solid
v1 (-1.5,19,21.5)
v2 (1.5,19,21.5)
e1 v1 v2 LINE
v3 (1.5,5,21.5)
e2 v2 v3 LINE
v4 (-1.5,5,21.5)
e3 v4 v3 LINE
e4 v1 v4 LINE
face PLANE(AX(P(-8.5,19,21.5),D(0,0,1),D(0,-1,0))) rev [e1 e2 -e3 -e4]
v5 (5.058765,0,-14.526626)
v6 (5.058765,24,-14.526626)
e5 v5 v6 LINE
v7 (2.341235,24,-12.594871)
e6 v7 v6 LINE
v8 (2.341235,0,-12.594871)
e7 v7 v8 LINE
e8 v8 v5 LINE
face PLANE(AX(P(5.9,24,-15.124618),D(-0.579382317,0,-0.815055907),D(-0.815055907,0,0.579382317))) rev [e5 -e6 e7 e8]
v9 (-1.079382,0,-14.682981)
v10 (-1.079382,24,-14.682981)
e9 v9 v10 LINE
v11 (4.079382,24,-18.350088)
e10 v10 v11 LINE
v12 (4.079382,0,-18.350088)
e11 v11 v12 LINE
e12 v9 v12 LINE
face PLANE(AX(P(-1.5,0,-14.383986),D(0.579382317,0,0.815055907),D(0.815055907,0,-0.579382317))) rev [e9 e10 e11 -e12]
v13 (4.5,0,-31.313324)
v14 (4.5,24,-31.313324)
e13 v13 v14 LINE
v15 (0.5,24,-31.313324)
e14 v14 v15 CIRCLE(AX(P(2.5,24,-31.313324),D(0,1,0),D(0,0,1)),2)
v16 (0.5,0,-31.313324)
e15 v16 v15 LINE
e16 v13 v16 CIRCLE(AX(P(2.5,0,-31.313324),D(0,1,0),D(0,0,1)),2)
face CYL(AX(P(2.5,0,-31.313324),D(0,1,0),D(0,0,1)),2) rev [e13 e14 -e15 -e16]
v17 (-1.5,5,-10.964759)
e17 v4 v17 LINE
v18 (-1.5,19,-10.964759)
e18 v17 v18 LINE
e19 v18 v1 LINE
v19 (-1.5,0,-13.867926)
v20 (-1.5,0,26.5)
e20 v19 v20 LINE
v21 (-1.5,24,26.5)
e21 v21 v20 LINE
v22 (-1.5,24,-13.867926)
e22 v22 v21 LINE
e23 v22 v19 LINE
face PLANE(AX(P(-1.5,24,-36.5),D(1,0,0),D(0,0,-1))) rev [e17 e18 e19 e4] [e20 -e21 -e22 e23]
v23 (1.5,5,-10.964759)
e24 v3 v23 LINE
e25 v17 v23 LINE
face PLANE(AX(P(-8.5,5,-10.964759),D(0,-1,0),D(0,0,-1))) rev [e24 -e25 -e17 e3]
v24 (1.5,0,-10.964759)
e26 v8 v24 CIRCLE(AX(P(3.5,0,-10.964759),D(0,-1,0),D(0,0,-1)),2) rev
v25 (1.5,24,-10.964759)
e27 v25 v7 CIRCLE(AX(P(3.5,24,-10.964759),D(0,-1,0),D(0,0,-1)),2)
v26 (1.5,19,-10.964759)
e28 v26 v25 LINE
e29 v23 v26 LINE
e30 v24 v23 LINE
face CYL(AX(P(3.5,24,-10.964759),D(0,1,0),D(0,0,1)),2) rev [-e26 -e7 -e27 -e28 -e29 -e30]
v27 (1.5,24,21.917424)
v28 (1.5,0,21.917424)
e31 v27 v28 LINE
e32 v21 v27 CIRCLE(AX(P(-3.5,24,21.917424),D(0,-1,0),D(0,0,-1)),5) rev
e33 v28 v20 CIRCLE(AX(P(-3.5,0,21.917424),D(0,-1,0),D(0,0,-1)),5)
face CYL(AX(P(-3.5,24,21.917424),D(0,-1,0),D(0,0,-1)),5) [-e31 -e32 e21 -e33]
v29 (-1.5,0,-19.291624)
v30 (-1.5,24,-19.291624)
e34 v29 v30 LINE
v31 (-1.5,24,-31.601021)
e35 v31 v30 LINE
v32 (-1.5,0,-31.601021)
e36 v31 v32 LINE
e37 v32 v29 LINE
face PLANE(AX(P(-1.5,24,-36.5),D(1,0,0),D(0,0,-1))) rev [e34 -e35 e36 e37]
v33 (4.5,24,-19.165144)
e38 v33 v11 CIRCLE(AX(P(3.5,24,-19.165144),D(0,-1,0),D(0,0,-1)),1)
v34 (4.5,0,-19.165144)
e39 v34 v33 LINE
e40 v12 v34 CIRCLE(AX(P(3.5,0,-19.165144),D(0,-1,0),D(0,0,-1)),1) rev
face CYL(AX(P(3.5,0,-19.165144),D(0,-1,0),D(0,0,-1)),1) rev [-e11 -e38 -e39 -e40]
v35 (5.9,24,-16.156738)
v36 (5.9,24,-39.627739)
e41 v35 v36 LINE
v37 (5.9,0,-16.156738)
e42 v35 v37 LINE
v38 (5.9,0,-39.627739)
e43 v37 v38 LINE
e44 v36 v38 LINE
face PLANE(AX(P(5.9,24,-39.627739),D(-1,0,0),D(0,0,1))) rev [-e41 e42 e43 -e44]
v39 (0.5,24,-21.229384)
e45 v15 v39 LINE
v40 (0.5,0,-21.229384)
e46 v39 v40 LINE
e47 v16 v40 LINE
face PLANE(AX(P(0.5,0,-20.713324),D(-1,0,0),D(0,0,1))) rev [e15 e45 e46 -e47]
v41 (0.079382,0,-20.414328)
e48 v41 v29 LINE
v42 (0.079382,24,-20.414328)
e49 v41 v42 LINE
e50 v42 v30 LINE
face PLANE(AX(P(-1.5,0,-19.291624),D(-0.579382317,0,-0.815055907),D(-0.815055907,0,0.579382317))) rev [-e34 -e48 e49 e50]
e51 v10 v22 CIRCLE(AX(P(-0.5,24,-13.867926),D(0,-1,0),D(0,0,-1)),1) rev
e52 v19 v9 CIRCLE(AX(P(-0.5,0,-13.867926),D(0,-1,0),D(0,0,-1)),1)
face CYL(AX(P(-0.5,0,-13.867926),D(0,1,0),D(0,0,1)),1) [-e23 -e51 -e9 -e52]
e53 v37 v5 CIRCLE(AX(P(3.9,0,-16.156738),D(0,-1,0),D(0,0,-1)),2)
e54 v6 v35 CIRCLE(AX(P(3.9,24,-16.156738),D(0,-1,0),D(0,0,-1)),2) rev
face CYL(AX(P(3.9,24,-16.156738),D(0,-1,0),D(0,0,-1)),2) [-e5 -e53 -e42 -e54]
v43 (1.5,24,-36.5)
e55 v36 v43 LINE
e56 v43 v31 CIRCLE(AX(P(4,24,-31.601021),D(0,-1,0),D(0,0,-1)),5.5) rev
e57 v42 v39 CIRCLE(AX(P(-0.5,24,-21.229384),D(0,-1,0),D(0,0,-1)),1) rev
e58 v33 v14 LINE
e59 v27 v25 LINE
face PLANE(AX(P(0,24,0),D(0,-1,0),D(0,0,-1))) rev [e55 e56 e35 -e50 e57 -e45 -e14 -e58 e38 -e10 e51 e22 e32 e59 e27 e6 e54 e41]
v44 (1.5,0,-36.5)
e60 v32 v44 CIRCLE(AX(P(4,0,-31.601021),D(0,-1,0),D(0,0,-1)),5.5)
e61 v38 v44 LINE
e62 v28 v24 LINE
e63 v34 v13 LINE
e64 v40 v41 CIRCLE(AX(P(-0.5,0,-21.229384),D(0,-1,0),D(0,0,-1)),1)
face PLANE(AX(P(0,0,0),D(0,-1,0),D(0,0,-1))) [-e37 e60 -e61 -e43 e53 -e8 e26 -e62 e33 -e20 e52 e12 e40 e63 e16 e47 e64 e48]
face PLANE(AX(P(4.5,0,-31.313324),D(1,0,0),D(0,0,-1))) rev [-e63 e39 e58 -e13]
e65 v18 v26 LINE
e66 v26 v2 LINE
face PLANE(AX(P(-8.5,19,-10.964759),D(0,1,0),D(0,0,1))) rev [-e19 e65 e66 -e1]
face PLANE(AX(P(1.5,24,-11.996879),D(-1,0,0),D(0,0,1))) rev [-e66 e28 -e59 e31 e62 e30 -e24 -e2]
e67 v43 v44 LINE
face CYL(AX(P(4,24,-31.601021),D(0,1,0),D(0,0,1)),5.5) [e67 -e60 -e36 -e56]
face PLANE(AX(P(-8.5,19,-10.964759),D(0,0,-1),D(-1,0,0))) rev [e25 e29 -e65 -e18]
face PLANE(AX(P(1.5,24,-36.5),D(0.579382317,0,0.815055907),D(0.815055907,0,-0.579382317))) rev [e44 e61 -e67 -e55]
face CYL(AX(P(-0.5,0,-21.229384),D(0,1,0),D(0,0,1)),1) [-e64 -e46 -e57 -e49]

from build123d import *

# Parameters (mm, degrees)
BOSS_EXTRUDE1_DEPTH = 24
CUT_EXTRUDE1_DEPTH  = 24
FILLET5_R           = 1
FILLET6_R           = 5.5
FILLET8_R           = 2
SKETCH3_W           = 32.464758902
SKETCH3_H           = 14
CUT_EXTRUDE2_DEPTH  = 10
FILLET9_R           = 5


with BuildPart() as part:
    # Sketch1 → Boss-Extrude1 (new body)
    with BuildSketch(Plane(origin=(0, 0, 0), x_dir=(1, 0, 0), z_dir=(0, 1, 0))):
        Polygon((1.5, 36.5), (5.9, 39.627739059), (5.9, 15.124617794), (1.5, 11.996878735), (1.5, -26.5), (-1.5, -26.5), (-1.5, 36.5), align=None)
    extrude(amount=BOSS_EXTRUDE1_DEPTH)

    # Sketch2 → Cut-Extrude1 (cut)
    with BuildSketch(Plane(origin=(0, 24, 0), x_dir=(1, 0, 0), z_dir=(0, 1, 0))):
        with BuildLine():
            Line((-1.5, 14.383985508), (4.5, 18.649084224))
            Line((4.5, 18.649084224), (4.5, 31.313323891))
            ThreePointArc((4.5, 31.313323891), (2.5, 33.313323891), (0.5, 31.313323891))
            Line((0.5, 31.313323891), (0.5, 20.713323891))
            Line((0.5, 20.713323891), (-1.5, 19.291624318))
            Line((-1.5, 19.291624318), (-1.5, 14.383985508))
        make_face()
    extrude(amount=-CUT_EXTRUDE1_DEPTH, mode=Mode.SUBTRACT)

    # Fillet5
    fillet5_edges = [part.edges().sort_by_distance(p)[0] for p in [
        (-1.5, 12, -14.383985508),
        (0.5, 12, -20.713323891),
        (4.5, 12, -18.649084224),
    ]]
    fillet(fillet5_edges, radius=FILLET5_R)

    # Fillet6
    # the kernel refuses this fillet: 5.5 mm, written as the material it takes off along each edge
    with BuildSketch(Plane(origin=(-1.5, -12.247448714, -36.5), x_dir=(0, 0, 1), z_dir=(0, 1, 0))) as fillet6_piece_1:
        with BuildLine():
            CenterArc((4.898979486, 5.5), FILLET6_R, 207.035691789, 62.964308211)
            Line((0, 3), (-0.09797959, 2.95))
            ThreePointArc((-0.09797959, 2.95), (-0.11, 1.5), (-0.11, 0))
            Line((-0.11, 0), (0, -0.11))
            Line((0, -0.11), (4.898979486, -0.11))
            Line((4.898979486, -0.11), (4.898979486, 0))
        make_face()
    extrude(amount=48.494897428, mode=Mode.SUBTRACT)

    # Fillet8
    fillet8_edges = [part.edges().sort_by_distance(p)[0] for p in [
        (5.9, 12, -15.124617794),
        (1.5, 12, -11.996878735),
    ]]
    fillet(fillet8_edges, radius=FILLET8_R)

    # Sketch3 → Cut-Extrude2 (cut)
    with BuildSketch(Plane(origin=(1.5, 0, 0), x_dir=(0, 0, -1), z_dir=(1, 0, 0))):
        with Locations((-5.267620549, 12)):
            Rectangle(SKETCH3_W, SKETCH3_H)
    extrude(amount=-CUT_EXTRUDE2_DEPTH, mode=Mode.SUBTRACT)

    # Fillet9
    # the kernel refuses this fillet: 5 mm, written as the material it takes off along each edge
    with BuildSketch(Plane(origin=(1.5, -11.456439237, 26.5), x_dir=(0, 0, -1), z_dir=(0, 1, 0))) as fillet9_piece_1:
        with BuildLine():
            CenterArc((4.582575695, 5), FILLET9_R, 203.578178478, 66.421821522)
            Line((0, 3), (-0.091651514, 2.96))
            ThreePointArc((-0.091651514, 2.96), (-0.1, 1.5), (-0.1, 0))
            Line((-0.1, 0), (0, -0.1))
            Line((0, -0.1), (4.582575695, -0.1))
            Line((4.582575695, -0.1), (4.582575695, 0))
        make_face()
    extrude(amount=46.912878475, mode=Mode.SUBTRACT)


solid = part.part
